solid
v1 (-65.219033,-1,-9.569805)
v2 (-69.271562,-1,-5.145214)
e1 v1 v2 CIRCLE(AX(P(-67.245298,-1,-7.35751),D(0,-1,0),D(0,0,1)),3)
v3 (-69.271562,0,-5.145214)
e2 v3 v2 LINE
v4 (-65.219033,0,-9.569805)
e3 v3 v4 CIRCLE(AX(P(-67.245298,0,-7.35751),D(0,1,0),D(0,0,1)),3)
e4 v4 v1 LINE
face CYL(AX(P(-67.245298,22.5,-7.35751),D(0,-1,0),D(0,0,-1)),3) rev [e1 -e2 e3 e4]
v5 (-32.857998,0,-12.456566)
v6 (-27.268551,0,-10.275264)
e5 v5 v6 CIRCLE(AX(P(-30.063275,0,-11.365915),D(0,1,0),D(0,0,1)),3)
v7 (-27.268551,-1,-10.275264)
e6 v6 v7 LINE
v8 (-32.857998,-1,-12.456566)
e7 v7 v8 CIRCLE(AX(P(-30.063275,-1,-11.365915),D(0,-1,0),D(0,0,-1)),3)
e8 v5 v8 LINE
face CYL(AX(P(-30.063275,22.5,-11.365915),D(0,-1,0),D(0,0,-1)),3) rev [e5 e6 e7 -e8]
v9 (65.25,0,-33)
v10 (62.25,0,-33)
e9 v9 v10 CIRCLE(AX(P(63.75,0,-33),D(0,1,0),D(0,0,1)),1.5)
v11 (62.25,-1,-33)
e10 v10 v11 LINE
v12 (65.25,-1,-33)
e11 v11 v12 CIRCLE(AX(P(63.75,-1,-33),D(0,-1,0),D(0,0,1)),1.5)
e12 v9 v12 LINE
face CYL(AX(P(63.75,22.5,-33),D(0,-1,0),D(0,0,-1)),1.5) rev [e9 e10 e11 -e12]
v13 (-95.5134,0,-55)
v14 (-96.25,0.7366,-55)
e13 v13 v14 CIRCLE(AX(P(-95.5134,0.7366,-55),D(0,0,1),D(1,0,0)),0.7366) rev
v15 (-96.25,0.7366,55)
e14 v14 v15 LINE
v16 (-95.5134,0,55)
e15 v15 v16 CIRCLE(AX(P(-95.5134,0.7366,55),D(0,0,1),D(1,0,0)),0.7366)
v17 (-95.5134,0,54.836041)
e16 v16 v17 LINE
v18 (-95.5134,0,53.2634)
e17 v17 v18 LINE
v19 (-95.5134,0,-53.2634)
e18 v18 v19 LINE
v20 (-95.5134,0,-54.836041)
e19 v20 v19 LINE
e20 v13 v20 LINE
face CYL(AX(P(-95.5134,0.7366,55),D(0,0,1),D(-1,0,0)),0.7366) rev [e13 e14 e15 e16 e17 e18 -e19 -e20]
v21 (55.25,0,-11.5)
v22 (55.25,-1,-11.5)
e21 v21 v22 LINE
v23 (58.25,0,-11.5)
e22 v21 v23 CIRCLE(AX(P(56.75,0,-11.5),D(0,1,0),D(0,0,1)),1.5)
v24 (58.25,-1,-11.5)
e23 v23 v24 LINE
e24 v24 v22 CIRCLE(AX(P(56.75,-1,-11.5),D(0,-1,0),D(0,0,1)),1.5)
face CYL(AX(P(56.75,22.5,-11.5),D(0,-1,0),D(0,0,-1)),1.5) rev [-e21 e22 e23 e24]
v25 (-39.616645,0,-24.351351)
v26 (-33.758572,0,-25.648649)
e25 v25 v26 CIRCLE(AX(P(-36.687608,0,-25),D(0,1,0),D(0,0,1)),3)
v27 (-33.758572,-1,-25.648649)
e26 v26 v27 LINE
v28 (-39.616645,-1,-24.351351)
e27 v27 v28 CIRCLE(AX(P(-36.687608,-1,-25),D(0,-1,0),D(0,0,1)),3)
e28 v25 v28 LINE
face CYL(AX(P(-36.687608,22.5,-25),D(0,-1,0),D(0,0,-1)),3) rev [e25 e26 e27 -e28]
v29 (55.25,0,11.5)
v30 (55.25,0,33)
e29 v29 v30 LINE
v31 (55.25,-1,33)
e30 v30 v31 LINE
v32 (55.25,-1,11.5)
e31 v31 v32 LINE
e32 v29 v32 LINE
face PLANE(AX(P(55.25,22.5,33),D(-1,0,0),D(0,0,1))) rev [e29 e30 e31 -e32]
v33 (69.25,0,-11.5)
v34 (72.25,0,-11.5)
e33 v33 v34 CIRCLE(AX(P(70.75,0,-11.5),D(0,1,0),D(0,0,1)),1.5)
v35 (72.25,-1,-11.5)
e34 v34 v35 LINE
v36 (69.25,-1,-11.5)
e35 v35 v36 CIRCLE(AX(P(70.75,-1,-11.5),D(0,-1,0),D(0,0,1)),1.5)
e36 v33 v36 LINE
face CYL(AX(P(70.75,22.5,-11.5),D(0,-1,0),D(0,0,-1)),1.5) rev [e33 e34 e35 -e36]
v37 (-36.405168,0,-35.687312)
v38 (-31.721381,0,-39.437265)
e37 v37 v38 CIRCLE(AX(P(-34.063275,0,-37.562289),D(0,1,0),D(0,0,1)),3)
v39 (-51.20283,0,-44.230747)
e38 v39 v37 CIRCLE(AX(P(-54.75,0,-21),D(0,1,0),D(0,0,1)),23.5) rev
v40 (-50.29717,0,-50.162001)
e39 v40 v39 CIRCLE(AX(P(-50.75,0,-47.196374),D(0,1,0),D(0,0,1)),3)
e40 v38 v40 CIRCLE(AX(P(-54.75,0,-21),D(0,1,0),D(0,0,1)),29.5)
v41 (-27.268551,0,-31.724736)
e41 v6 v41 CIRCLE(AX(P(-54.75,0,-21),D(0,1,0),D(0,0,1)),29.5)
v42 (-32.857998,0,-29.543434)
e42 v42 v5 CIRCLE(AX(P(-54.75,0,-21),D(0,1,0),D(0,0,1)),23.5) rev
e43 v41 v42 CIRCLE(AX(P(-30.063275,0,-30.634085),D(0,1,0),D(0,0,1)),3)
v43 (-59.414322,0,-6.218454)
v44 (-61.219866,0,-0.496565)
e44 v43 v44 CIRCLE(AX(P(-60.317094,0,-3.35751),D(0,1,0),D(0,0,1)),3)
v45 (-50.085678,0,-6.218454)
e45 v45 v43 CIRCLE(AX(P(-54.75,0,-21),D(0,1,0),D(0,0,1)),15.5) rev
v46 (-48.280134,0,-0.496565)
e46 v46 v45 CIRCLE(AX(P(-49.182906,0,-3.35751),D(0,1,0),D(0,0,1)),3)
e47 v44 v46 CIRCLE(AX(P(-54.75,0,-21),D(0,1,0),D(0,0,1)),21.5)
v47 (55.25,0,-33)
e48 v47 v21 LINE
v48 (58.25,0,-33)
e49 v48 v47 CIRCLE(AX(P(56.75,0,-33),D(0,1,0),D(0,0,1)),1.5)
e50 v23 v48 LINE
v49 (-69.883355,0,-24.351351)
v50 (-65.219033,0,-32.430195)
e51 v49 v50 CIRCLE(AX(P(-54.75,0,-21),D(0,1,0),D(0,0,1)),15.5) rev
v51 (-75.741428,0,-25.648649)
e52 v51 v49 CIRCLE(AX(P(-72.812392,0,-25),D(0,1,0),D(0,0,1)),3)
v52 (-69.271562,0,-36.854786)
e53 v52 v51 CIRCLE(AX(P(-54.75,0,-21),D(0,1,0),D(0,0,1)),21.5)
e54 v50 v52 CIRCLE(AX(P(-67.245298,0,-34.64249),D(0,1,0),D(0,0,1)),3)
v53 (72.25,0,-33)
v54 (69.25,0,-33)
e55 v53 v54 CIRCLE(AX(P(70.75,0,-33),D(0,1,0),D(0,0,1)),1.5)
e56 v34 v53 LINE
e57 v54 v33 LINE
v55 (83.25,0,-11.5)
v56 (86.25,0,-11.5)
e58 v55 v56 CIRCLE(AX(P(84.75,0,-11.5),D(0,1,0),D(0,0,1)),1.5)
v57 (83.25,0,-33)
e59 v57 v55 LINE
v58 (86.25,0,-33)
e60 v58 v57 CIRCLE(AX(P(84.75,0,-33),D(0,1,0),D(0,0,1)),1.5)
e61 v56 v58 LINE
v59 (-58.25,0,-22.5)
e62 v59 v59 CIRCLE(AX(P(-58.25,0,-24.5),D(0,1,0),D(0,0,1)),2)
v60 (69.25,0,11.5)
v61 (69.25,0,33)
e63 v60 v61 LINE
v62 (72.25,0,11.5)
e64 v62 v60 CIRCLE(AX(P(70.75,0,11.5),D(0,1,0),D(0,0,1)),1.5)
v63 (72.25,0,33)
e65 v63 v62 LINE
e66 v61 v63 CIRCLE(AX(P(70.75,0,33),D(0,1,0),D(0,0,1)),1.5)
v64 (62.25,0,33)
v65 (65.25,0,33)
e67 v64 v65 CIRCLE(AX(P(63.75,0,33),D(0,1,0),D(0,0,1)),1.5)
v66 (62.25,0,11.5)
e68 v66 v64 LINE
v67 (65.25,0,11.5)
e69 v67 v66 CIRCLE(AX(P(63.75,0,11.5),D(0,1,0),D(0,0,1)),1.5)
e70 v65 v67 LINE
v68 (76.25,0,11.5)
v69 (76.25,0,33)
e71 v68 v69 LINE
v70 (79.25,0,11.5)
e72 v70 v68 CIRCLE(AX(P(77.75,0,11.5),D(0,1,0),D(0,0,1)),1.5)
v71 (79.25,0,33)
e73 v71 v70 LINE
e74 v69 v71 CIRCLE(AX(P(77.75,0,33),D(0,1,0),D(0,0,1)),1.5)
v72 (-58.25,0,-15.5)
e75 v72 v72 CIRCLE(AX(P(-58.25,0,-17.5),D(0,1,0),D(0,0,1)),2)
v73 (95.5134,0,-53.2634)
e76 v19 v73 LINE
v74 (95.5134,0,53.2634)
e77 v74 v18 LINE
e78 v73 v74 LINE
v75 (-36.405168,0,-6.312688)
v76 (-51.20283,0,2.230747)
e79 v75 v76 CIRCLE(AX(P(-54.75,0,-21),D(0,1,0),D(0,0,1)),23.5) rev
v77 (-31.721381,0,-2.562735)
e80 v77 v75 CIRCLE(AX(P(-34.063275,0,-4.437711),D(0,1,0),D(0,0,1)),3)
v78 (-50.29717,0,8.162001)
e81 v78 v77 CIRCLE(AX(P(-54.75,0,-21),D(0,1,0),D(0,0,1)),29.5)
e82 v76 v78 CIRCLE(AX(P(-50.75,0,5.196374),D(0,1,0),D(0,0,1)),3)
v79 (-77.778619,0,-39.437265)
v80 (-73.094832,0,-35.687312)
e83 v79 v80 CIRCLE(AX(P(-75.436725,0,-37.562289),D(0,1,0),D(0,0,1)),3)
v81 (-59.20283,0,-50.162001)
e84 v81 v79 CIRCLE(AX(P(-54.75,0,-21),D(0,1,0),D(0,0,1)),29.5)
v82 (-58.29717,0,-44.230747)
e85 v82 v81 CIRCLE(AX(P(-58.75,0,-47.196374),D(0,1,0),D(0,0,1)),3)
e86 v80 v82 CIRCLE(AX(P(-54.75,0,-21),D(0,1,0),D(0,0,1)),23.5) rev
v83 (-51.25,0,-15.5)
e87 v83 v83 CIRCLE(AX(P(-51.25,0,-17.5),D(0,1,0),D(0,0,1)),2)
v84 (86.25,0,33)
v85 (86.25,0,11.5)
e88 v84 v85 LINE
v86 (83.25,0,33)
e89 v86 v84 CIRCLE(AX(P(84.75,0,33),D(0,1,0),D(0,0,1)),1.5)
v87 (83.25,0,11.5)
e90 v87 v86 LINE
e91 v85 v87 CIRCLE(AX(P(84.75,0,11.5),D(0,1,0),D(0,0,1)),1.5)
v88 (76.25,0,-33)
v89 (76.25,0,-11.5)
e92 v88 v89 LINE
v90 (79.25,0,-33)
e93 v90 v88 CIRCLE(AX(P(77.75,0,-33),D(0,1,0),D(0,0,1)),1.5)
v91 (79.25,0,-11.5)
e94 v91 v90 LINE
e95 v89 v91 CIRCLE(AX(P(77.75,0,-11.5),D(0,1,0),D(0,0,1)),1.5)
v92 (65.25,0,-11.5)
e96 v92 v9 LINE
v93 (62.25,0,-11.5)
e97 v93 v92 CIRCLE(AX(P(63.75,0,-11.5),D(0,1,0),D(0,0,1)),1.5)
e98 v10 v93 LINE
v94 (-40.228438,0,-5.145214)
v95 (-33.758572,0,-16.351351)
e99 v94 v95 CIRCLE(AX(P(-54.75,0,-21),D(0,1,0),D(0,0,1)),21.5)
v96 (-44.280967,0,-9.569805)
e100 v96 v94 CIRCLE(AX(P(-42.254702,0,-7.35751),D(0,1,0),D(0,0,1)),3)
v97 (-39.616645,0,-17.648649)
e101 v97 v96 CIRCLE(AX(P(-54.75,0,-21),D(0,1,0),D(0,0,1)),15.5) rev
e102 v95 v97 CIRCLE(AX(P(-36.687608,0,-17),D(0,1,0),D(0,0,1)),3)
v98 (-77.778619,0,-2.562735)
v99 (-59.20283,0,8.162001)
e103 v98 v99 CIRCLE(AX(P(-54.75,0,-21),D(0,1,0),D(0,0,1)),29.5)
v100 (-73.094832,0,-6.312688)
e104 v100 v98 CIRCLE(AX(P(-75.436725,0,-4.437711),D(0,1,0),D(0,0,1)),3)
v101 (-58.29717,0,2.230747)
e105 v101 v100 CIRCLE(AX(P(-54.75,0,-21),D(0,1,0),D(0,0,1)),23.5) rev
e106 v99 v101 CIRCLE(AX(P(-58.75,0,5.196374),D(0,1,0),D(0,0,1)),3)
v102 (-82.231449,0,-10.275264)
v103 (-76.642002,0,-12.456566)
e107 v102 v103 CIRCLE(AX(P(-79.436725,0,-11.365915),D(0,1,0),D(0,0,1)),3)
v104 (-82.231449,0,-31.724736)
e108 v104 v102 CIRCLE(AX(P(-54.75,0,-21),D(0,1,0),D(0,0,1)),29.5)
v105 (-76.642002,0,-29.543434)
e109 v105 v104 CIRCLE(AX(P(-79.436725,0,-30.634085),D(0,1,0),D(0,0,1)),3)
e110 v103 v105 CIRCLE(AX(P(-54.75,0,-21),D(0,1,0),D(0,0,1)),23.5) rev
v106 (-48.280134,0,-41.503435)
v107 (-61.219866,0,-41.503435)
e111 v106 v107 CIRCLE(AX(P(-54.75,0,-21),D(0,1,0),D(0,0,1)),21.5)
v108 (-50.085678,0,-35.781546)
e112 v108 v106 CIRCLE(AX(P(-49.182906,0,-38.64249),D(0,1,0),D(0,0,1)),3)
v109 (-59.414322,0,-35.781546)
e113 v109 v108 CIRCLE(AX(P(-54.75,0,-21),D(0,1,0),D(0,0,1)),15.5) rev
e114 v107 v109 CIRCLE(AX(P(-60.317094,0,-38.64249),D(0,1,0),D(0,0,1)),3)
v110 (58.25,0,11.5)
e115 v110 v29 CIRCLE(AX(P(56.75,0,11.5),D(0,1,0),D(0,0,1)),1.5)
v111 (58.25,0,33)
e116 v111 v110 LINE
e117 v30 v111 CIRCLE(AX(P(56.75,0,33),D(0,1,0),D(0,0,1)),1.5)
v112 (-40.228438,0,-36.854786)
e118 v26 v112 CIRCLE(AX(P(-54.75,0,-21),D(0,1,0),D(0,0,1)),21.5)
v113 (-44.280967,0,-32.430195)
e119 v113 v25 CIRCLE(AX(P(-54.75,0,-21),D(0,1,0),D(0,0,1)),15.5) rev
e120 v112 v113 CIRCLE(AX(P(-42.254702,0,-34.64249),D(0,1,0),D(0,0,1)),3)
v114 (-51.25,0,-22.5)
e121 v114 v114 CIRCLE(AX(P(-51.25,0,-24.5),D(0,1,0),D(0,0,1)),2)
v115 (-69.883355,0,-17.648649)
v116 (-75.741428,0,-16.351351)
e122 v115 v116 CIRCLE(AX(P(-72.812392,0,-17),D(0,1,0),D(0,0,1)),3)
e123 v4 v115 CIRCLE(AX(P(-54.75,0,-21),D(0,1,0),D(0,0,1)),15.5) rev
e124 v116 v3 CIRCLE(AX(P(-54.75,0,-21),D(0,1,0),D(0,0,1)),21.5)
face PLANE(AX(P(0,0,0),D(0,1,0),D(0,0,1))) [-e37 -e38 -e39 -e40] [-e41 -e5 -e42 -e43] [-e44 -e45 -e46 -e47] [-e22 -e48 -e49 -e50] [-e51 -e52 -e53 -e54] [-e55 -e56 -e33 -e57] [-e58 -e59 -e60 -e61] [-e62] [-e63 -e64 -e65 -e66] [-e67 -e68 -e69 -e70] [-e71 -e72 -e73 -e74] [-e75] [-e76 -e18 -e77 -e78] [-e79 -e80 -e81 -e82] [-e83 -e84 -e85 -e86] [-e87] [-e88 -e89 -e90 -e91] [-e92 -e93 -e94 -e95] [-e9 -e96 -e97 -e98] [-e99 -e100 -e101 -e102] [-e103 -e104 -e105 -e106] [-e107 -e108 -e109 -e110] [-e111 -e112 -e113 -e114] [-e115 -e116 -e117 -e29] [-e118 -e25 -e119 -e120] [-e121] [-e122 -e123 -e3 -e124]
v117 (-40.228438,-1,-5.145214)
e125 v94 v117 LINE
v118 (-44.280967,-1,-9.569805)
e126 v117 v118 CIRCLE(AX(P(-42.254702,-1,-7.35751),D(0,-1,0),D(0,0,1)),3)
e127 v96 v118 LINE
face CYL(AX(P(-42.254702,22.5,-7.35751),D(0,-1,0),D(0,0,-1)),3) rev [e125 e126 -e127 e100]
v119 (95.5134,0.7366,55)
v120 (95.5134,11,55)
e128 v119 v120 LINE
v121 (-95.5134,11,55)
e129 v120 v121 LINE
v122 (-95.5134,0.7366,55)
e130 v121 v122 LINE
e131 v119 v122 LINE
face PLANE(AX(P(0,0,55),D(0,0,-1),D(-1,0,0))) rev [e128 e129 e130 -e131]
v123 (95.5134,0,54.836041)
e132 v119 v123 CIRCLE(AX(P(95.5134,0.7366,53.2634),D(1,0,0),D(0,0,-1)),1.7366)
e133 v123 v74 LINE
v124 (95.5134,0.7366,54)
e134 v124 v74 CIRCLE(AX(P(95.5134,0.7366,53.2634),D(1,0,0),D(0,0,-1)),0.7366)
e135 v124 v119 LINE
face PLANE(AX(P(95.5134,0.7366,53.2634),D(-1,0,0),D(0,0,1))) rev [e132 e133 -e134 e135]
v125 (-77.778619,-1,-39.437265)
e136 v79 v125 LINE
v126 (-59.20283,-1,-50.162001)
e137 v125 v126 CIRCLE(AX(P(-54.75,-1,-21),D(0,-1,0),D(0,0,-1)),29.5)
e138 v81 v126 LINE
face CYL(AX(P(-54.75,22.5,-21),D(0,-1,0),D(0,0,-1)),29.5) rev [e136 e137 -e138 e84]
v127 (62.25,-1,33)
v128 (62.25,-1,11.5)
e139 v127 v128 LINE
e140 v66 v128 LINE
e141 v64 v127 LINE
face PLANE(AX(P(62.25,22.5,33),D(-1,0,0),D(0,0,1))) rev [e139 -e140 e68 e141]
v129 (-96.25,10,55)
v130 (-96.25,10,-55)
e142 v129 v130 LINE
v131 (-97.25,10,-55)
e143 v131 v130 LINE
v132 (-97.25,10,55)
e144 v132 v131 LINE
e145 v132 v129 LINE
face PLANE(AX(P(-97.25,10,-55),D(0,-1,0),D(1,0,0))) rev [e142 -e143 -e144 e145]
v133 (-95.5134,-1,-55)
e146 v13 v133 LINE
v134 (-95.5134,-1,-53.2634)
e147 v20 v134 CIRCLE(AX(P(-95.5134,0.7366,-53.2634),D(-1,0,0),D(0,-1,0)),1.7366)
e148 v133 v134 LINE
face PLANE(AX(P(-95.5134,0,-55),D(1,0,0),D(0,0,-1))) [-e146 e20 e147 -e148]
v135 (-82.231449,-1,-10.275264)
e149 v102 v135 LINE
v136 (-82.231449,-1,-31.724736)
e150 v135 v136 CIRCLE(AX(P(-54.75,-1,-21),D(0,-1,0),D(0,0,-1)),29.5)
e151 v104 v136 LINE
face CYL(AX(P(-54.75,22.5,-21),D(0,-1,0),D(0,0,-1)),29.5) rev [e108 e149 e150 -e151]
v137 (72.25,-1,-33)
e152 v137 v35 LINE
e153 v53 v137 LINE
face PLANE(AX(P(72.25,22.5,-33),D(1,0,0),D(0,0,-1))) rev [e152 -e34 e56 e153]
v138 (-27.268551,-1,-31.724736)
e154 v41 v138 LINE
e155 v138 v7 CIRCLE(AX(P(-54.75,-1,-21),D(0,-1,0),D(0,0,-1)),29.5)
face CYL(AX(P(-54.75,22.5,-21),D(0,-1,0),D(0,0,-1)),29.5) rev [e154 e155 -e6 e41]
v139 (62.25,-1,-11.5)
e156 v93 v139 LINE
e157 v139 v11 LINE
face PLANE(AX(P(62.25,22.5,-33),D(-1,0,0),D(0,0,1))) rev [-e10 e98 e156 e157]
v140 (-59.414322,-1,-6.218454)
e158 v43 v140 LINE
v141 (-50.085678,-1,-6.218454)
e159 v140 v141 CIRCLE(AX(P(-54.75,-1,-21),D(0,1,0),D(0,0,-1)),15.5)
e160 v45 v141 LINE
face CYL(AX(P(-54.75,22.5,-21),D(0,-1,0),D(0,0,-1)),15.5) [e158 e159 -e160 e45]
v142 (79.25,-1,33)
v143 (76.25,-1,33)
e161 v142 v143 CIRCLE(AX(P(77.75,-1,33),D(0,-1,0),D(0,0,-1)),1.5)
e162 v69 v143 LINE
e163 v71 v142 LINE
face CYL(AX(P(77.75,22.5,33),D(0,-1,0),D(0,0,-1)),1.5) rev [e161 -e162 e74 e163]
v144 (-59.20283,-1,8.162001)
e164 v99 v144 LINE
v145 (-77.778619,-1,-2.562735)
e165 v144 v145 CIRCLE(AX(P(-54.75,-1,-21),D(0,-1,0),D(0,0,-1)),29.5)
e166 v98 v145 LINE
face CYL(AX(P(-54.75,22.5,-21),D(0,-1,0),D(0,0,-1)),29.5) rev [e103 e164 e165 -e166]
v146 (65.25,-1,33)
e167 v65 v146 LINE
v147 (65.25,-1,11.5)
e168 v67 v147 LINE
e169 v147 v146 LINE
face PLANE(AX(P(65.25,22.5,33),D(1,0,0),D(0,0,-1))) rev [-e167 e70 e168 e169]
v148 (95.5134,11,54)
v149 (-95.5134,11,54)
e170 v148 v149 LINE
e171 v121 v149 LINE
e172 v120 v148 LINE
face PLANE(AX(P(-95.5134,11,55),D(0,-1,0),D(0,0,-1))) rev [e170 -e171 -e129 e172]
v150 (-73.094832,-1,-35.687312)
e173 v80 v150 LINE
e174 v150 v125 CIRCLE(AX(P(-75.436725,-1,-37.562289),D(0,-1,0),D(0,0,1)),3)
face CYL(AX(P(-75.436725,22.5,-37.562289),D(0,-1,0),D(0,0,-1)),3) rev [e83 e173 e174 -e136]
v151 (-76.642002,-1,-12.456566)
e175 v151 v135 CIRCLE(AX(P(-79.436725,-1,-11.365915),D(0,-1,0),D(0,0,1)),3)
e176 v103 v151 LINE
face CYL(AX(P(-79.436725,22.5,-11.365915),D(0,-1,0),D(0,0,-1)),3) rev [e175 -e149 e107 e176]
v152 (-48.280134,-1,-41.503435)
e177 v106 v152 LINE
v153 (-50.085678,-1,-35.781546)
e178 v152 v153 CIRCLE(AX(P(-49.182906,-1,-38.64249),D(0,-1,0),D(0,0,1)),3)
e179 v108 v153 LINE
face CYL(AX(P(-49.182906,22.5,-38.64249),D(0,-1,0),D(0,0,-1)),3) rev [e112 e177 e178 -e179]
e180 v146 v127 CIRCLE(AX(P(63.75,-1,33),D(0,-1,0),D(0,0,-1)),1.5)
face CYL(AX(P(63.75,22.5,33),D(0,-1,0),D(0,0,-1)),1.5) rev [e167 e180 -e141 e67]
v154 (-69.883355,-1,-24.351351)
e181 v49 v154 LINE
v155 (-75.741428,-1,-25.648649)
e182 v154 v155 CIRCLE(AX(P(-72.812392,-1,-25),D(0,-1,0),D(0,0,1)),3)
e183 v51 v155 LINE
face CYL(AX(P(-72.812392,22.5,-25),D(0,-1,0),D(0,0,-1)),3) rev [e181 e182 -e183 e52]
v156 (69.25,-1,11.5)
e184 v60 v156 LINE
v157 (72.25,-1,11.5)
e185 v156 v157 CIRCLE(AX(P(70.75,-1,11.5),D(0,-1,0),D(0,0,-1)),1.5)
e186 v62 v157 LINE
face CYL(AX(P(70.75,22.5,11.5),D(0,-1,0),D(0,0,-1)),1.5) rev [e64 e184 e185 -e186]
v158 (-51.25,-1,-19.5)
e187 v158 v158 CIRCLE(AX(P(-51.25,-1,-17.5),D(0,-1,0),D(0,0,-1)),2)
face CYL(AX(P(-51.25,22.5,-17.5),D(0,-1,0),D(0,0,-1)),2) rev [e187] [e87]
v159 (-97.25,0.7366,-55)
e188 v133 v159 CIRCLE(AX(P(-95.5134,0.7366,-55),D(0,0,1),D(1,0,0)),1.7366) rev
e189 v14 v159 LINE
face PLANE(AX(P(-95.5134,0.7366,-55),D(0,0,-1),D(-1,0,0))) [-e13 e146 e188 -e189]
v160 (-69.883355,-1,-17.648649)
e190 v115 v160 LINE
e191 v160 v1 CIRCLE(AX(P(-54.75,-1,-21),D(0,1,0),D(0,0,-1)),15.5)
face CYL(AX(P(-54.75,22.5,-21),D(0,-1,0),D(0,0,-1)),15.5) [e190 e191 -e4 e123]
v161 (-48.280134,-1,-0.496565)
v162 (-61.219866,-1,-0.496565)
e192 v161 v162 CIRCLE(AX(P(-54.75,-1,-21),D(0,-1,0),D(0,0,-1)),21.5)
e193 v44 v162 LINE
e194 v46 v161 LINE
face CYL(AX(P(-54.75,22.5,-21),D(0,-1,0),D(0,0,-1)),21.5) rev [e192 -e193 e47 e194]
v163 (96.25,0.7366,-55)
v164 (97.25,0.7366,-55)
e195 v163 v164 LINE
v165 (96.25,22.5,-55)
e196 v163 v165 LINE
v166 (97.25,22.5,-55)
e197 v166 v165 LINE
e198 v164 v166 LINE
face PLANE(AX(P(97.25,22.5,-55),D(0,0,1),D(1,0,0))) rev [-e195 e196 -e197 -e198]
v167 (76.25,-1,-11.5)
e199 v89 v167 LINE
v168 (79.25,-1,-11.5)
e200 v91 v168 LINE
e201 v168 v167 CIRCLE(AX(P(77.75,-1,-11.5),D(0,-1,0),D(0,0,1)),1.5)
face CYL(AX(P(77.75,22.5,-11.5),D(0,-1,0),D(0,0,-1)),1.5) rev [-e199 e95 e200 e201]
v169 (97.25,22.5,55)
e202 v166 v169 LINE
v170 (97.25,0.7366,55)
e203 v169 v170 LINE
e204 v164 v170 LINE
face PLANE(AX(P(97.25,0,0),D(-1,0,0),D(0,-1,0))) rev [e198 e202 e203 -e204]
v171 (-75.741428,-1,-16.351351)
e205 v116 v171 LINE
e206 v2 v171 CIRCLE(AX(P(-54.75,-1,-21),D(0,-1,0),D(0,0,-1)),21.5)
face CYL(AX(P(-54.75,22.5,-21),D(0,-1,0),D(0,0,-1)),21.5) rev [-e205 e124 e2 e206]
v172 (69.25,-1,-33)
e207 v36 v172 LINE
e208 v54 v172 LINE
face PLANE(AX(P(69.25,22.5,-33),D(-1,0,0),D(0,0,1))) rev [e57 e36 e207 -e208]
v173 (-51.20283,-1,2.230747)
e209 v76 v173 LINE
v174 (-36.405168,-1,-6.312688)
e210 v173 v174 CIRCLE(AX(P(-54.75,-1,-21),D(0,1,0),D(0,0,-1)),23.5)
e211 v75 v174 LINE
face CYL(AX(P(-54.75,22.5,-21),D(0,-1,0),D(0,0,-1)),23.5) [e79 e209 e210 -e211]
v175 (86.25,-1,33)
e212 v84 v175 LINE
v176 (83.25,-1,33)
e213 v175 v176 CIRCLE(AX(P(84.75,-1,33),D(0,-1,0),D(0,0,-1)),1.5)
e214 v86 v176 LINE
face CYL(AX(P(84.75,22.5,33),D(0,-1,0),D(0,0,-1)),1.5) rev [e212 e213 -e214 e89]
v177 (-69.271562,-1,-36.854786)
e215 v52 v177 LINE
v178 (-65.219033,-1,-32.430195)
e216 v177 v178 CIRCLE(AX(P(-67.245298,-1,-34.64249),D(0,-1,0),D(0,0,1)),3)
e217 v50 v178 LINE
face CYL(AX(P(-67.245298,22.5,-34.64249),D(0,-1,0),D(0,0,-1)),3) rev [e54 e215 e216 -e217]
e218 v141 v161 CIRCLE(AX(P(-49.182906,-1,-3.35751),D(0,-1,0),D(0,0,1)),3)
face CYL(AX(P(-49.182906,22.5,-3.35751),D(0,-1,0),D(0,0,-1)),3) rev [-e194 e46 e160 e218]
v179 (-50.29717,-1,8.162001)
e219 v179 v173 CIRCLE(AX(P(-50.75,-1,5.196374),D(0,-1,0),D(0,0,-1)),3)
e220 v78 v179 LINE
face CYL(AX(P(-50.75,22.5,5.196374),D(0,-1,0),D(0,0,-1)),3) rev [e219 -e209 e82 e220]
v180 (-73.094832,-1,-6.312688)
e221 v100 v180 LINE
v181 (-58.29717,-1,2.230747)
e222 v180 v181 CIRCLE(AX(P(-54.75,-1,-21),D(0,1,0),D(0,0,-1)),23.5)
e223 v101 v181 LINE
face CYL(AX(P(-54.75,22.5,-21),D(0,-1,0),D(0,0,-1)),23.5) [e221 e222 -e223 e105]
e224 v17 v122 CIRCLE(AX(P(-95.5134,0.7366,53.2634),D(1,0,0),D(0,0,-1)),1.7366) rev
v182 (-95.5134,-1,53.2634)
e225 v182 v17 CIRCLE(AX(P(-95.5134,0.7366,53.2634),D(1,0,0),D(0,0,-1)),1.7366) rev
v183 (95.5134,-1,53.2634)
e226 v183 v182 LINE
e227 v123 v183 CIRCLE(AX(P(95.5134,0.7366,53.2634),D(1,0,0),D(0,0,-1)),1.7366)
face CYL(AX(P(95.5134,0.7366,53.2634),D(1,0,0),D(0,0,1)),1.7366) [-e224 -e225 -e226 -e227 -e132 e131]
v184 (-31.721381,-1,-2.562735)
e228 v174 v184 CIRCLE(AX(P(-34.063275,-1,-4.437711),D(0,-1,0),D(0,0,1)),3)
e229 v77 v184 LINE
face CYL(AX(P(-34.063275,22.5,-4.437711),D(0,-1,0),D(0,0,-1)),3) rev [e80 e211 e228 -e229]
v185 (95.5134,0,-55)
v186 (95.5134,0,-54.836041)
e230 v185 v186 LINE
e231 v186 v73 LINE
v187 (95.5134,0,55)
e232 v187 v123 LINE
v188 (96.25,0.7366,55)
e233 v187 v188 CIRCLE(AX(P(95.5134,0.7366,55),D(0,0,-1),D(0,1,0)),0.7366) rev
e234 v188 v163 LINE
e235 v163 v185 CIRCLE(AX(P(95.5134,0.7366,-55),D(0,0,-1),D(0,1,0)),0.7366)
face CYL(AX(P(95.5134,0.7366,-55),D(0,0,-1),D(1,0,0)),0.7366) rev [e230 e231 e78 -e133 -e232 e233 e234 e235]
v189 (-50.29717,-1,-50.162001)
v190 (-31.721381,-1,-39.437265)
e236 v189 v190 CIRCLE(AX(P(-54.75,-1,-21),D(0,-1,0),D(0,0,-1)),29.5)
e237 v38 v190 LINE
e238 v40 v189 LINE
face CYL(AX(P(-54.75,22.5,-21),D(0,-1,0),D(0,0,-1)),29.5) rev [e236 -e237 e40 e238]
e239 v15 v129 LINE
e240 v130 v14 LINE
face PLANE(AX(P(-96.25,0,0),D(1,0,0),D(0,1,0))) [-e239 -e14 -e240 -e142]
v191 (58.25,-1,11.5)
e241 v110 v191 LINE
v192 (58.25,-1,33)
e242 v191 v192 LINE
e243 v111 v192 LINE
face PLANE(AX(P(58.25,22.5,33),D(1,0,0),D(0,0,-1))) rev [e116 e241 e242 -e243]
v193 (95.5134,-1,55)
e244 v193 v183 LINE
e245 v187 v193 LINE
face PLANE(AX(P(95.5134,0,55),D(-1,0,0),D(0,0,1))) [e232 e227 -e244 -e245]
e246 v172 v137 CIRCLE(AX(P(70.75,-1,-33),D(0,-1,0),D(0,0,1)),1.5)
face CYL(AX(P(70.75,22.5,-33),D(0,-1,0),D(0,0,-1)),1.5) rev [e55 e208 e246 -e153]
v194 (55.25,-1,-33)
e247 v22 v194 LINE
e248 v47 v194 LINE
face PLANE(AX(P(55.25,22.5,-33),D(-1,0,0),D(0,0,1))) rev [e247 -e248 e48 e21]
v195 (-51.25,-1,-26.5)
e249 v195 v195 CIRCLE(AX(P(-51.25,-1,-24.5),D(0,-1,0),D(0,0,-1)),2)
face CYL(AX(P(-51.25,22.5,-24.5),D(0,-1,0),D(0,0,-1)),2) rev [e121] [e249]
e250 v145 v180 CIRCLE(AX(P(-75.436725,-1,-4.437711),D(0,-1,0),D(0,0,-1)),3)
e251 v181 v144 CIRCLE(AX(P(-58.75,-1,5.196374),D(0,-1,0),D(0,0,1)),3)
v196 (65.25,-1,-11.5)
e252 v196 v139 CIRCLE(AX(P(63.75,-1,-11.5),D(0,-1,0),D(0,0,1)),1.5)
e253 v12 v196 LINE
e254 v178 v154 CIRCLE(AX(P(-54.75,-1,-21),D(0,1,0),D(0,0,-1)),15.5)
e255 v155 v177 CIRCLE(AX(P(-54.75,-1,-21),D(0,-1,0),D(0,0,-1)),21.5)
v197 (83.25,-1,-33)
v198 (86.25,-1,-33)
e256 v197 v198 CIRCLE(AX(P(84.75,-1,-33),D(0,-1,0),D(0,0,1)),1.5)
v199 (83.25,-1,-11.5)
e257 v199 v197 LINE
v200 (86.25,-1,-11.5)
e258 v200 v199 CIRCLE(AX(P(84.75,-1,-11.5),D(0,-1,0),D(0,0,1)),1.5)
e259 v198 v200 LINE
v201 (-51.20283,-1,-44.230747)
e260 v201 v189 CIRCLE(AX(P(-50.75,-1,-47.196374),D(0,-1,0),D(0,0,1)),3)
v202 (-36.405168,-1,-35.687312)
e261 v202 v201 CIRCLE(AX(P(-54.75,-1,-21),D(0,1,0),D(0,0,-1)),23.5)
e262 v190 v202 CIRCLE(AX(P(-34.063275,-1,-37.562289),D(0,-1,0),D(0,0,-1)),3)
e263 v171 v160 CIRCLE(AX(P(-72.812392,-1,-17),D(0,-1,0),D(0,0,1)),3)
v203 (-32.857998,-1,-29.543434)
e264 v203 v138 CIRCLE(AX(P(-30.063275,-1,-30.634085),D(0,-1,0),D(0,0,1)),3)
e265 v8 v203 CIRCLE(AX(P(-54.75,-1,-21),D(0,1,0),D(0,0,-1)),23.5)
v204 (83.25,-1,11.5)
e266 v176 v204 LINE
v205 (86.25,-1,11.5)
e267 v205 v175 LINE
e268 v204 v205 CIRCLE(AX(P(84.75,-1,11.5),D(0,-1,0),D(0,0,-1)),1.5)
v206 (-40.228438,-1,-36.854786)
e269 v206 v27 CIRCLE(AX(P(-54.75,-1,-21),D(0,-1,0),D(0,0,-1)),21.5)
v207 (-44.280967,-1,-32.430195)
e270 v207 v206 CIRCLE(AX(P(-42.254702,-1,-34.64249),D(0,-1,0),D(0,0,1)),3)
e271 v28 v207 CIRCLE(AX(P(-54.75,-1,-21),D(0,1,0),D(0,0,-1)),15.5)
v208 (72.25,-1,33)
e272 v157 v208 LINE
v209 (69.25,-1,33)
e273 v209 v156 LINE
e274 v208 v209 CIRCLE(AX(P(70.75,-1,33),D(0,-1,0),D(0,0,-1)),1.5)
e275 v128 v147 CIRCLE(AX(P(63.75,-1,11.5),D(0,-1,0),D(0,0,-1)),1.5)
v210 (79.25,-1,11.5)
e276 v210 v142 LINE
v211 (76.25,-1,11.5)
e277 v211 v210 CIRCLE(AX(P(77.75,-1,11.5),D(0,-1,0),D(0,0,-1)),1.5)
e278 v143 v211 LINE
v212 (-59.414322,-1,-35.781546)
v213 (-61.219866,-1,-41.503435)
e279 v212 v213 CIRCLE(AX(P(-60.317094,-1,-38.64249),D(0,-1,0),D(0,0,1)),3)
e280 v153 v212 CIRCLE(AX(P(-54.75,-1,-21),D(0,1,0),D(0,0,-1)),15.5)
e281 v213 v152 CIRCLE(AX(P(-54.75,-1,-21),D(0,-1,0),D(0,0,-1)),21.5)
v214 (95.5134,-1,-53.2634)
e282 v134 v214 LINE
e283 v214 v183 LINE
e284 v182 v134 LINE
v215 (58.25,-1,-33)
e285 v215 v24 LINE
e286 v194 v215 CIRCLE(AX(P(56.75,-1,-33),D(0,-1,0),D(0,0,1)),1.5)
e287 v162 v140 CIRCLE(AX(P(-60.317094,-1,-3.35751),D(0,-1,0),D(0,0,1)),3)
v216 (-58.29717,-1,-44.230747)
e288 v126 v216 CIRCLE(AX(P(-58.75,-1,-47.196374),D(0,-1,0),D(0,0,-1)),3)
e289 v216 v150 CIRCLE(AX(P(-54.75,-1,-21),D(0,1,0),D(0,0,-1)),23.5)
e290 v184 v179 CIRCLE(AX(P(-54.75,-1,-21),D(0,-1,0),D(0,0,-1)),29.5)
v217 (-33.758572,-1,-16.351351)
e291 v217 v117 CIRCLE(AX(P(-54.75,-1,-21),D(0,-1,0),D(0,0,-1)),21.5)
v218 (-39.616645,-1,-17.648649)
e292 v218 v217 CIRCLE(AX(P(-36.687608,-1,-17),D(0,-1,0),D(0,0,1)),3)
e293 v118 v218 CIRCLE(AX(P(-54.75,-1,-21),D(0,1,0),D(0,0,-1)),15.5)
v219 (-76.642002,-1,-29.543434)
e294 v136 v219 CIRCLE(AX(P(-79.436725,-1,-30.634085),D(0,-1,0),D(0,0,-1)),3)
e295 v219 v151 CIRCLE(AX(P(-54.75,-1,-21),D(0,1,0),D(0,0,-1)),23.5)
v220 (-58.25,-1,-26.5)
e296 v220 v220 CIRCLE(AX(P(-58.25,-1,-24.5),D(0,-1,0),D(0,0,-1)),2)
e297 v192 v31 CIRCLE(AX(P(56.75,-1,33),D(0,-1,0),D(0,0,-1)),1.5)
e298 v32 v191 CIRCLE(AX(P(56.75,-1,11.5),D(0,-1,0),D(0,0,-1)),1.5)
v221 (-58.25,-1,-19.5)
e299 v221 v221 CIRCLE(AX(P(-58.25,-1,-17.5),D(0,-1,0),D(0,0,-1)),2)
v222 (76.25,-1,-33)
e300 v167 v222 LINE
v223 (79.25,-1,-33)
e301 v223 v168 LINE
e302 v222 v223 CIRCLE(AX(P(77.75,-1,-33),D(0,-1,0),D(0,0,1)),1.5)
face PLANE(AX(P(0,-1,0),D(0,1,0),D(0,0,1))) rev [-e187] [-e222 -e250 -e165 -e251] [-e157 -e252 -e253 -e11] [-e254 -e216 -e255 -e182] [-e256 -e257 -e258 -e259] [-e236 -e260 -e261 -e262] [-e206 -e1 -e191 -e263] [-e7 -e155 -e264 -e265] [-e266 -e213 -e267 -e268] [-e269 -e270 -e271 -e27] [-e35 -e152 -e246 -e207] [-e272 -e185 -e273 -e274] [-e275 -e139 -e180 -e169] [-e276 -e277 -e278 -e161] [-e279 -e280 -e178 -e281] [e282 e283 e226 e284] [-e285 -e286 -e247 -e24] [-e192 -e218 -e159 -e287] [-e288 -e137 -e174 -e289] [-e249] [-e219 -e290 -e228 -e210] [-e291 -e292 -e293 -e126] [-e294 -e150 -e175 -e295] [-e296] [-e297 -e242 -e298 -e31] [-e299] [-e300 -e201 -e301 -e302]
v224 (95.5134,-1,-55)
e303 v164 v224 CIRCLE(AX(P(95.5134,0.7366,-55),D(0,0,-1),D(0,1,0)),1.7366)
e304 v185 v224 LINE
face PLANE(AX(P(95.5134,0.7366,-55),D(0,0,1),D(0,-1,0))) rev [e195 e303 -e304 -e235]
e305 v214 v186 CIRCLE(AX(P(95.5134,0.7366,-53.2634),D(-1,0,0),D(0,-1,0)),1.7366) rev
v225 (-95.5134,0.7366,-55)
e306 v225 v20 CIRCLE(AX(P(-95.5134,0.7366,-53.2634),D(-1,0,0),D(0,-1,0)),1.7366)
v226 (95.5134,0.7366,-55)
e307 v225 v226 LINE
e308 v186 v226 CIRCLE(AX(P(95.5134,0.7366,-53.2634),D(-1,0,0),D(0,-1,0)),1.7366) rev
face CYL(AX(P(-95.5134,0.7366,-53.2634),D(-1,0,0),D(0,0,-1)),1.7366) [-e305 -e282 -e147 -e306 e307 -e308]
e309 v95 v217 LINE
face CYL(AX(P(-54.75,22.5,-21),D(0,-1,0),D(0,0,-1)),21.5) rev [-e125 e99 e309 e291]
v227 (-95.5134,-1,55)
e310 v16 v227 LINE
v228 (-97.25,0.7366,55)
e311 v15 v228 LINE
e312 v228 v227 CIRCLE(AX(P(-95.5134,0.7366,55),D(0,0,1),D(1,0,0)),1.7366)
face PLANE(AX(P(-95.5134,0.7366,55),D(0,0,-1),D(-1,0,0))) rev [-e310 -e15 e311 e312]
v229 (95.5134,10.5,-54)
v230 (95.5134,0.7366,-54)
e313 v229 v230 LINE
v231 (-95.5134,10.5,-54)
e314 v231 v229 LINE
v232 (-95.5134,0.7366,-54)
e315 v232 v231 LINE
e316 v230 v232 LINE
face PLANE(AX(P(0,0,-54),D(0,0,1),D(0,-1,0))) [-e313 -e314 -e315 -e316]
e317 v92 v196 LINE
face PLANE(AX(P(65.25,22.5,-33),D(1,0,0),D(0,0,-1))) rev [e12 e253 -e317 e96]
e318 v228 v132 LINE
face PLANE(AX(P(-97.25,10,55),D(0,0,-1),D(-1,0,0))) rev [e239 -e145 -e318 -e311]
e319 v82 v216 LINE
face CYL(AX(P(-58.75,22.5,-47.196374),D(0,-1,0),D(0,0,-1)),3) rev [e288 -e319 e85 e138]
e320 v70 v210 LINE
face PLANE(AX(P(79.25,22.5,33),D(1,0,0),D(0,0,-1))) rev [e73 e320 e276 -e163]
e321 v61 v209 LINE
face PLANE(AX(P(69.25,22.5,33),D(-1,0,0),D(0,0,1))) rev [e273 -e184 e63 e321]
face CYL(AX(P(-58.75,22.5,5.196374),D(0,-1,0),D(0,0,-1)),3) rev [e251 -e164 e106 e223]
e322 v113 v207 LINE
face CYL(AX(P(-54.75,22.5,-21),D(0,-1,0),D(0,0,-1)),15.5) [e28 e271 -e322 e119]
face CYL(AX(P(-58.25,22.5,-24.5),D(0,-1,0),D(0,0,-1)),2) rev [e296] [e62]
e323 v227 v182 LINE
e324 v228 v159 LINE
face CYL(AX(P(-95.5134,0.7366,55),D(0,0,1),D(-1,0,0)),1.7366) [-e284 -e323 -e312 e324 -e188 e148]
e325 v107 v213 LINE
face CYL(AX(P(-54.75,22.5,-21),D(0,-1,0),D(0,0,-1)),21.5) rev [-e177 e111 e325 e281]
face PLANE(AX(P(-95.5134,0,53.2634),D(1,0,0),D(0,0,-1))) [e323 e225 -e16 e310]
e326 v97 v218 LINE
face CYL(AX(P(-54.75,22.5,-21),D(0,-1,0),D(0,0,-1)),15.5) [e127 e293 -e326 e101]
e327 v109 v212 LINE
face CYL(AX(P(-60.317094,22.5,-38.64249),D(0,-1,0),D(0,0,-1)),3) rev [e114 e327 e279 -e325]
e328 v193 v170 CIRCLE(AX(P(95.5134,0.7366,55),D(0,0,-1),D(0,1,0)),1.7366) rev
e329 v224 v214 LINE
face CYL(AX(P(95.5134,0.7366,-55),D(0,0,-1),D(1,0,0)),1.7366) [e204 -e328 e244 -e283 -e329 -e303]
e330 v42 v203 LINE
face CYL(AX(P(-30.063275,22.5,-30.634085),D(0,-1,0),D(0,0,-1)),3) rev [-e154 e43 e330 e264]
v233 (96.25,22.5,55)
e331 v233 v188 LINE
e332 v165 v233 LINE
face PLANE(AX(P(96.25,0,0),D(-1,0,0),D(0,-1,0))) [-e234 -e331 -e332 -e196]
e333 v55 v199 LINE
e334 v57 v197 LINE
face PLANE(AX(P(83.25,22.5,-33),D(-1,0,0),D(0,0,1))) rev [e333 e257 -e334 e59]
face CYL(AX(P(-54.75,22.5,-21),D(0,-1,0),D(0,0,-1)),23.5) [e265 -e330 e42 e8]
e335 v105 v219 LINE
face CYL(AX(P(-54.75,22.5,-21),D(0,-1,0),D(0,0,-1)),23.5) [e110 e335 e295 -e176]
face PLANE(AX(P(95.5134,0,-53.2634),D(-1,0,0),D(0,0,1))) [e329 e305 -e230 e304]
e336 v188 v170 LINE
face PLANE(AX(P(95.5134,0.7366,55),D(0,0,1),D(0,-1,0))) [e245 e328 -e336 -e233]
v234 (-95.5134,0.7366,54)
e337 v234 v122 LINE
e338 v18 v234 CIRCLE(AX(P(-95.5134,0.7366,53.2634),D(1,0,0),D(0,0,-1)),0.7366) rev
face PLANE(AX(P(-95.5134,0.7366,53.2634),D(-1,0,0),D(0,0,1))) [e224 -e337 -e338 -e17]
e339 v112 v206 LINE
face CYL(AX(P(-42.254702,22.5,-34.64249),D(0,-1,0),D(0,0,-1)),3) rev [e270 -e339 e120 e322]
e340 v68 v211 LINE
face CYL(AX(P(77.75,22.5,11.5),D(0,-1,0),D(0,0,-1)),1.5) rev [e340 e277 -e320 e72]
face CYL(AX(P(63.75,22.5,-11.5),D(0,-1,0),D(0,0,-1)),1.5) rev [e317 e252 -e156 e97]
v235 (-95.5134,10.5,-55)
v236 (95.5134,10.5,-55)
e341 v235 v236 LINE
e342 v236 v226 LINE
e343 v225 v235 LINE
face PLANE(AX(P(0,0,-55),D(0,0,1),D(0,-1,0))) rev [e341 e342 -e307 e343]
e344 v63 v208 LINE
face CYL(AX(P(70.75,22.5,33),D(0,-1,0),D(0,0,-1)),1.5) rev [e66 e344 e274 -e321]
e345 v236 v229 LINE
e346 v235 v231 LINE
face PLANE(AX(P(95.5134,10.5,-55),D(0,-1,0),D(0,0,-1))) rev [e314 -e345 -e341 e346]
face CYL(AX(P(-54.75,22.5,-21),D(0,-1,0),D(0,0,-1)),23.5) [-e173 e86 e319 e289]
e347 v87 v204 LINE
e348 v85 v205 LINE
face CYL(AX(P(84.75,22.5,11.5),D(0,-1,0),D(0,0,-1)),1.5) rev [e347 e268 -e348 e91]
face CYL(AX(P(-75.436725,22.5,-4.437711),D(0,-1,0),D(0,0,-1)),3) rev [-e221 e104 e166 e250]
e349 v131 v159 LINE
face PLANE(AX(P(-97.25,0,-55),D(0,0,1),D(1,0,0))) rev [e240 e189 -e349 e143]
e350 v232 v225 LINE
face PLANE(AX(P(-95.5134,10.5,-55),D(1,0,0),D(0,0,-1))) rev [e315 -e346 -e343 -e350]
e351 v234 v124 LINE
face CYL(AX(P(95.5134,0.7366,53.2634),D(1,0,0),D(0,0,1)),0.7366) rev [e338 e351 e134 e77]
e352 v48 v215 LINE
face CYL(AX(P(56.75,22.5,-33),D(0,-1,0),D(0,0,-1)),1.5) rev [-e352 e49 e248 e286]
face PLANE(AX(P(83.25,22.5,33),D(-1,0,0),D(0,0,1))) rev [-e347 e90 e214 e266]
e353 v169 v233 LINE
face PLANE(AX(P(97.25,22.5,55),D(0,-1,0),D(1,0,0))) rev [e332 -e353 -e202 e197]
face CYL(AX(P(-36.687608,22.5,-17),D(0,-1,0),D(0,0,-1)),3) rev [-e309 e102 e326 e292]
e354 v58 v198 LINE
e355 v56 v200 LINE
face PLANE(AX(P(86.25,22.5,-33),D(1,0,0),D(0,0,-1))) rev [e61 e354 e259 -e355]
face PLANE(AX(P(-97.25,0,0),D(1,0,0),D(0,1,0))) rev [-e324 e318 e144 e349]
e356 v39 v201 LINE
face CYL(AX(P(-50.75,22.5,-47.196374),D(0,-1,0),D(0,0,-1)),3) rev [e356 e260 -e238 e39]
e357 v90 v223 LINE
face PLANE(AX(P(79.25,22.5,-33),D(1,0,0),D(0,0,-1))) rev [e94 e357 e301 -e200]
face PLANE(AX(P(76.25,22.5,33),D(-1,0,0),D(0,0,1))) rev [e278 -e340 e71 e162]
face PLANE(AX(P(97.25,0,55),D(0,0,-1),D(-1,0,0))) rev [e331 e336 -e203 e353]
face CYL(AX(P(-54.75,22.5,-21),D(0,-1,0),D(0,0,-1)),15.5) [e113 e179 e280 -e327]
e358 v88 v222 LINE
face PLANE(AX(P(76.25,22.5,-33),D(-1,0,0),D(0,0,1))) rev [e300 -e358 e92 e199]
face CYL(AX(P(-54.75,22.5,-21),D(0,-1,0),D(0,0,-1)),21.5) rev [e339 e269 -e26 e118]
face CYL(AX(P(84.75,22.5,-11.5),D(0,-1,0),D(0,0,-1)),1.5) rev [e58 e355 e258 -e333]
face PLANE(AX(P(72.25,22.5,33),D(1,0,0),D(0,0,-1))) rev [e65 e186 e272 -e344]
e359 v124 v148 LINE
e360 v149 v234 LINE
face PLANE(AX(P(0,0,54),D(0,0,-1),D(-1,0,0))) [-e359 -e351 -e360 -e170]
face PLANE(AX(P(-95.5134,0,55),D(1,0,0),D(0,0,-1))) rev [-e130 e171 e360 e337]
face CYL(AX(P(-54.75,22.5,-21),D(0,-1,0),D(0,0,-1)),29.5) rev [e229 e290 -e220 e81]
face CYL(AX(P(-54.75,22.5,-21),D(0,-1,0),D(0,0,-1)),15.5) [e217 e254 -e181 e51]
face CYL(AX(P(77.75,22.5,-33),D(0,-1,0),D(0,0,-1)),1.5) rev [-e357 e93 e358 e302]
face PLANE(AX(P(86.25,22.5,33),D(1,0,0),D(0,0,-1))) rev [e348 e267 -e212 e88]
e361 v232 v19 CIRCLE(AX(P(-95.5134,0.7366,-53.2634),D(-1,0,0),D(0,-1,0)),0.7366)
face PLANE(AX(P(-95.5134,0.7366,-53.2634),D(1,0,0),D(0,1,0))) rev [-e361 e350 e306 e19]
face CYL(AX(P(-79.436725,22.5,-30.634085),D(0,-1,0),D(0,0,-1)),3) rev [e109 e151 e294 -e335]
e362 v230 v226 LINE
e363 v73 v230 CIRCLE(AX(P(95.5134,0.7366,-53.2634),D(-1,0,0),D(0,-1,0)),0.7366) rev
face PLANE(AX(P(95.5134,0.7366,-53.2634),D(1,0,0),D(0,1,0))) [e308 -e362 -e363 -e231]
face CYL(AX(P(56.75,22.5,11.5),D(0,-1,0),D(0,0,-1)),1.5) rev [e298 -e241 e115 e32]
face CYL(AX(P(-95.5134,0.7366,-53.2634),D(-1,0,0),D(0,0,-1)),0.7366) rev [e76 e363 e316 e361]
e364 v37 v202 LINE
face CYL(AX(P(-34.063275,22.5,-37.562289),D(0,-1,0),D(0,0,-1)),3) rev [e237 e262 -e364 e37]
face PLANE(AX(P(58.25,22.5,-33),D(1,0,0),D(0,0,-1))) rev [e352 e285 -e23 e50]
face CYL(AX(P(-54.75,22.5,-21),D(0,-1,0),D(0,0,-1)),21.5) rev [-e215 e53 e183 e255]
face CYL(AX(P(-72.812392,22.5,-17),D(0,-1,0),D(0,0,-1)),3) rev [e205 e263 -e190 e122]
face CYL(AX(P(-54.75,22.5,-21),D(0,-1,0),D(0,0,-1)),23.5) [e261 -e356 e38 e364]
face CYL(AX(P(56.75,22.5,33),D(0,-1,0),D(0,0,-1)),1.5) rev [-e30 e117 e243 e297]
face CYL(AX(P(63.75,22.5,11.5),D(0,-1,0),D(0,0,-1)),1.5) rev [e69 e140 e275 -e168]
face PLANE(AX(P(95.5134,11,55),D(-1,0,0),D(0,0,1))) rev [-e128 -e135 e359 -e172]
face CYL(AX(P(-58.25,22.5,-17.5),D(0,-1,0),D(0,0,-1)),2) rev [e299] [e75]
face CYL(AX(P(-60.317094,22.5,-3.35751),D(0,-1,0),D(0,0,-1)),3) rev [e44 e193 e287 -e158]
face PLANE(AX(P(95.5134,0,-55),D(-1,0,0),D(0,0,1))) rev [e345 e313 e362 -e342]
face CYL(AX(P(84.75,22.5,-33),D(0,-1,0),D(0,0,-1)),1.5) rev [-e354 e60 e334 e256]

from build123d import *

# Parameters (mm, degrees)
SKETCH_1_W                       = 194.5
SKETCH_1_H                       = 110
SM_BASE_FLANGE_1_DEPTH           = 1
SM_EDGE_FLANGE_1_STRIP_W         = 5.4732
SM_EDGE_FLANGE_1_STRIP_H         = 1
SM_EDGE_FLANGE_1_STRIP_CUT_DEPTH = 110
SM_EDGE_FLANGE_1_DEPTH           = 110
SM_EDGE_FLANGE_2_STRIP_W         = 5.4732
SM_EDGE_FLANGE_2_STRIP_H         = 1
SM_EDGE_FLANGE_2_STRIP_CUT_DEPTH = 110
SM_EDGE_FLANGE_2_DEPTH           = 110
SM_EDGE_FLANGE_3_STRIP_W         = 5.4732
SM_EDGE_FLANGE_3_STRIP_H         = 1
SM_EDGE_FLANGE_3_STRIP_CUT_DEPTH = 191.0268
SM_EDGE_FLANGE_3_DEPTH           = 191.0268
SM_EDGE_FLANGE_4_STRIP_W         = 5.4732
SM_EDGE_FLANGE_4_STRIP_H         = 1
SM_EDGE_FLANGE_4_STRIP_CUT_DEPTH = 191.0268
SM_EDGE_FLANGE_4_DEPTH           = 191.0268
SKETCH_18_R                      = 2
CUT_EXTRUDE_1_DEPTH              = 115.170103355


# Sheet-metal steps are written as plain solids
with BuildPart() as part:
    # Sketch 1 → Базовая кромка1 (new body)
    with BuildSketch(Plane(origin=(0, 0, 0), x_dir=(1, 0, 0), z_dir=(0, 1, 0))):
        Rectangle(SKETCH_1_W, SKETCH_1_H)
    extrude(amount=-SM_BASE_FLANGE_1_DEPTH)

    # Ребро-кромка1 strip (across the edge) → Ребро-кромка1 strip cut (cut)
    with BuildSketch(Plane(origin=(97.25, 0, 55), x_dir=(-1, 0, 0), z_dir=(0, 0, -1))):
        with Locations((-1, -0.5)):
            Rectangle(SM_EDGE_FLANGE_1_STRIP_W, SM_EDGE_FLANGE_1_STRIP_H)
    extrude(amount=SM_EDGE_FLANGE_1_STRIP_CUT_DEPTH, mode=Mode.SUBTRACT)

    # Ребро-кромка1 section (across the edge) → Ребро-кромка1 (add)
    with BuildSketch(Plane(origin=(97.25, 0, 55), x_dir=(-1, 0, 0), z_dir=(0, 0, -1))):
        with BuildLine():
            Line((0, 0.7366), (0, 22.5))
            Line((0, 22.5), (1, 22.5))
            Line((1, 22.5), (1, 0.7366))
            ThreePointArc((1, 0.7366), (1.215745145, 0.215745145), (1.7366, 0))
            Line((1.7366, 0), (1.7366, -1))
            ThreePointArc((1.7366, -1), (0.508638364, -0.491361636), (0, 0.7366))
        make_face()
    extrude(amount=SM_EDGE_FLANGE_1_DEPTH)

    # Ребро-кромка2 strip (across the edge) → Ребро-кромка2 strip cut (cut)
    with BuildSketch(Plane(origin=(-97.25, 0, -55), x_dir=(1, 0, 0), z_dir=(0, 0, 1))):
        with Locations((-1, -0.5)):
            Rectangle(SM_EDGE_FLANGE_2_STRIP_W, SM_EDGE_FLANGE_2_STRIP_H)
    extrude(amount=SM_EDGE_FLANGE_2_STRIP_CUT_DEPTH, mode=Mode.SUBTRACT)

    # Ребро-кромка2 section (across the edge) → Ребро-кромка2 (add)
    with BuildSketch(Plane(origin=(-97.25, 0, -55), x_dir=(1, 0, 0), z_dir=(0, 0, 1))):
        with BuildLine():
            Line((0, 0.7366), (0, 10))
            Line((0, 10), (1, 10))
            Line((1, 10), (1, 0.7366))
            ThreePointArc((1, 0.7366), (1.215745145, 0.215745145), (1.7366, 0))
            Line((1.7366, 0), (1.7366, -1))
            ThreePointArc((1.7366, -1), (0.508638364, -0.491361636), (0, 0.7366))
        make_face()
    extrude(amount=SM_EDGE_FLANGE_2_DEPTH)

    # Ребро-кромка3 strip (across the edge) → Ребро-кромка3 strip cut (cut)
    with BuildSketch(Plane(origin=(-95.5134, 0, 55), x_dir=(0, 0, -1), z_dir=(1, 0, 0))):
        with Locations((-1, -0.5)):
            Rectangle(SM_EDGE_FLANGE_3_STRIP_W, SM_EDGE_FLANGE_3_STRIP_H)
    extrude(amount=SM_EDGE_FLANGE_3_STRIP_CUT_DEPTH, mode=Mode.SUBTRACT)

    # Ребро-кромка3 section (across the edge) → Ребро-кромка3 (add)
    with BuildSketch(Plane(origin=(-95.5134, 0, 55), x_dir=(0, 0, -1), z_dir=(1, 0, 0))):
        with BuildLine():
            Line((0, 0.7366), (0, 11))
            Line((0, 11), (1, 11))
            Line((1, 11), (1, 0.7366))
            ThreePointArc((1, 0.7366), (1.215745145, 0.215745145), (1.7366, 0))
            Line((1.7366, 0), (1.7366, -1))
            ThreePointArc((1.7366, -1), (0.508638364, -0.491361636), (0, 0.7366))
        make_face()
    extrude(amount=SM_EDGE_FLANGE_3_DEPTH)

    # Ребро-кромка4 strip (across the edge) → Ребро-кромка4 strip cut (cut)
    with BuildSketch(Plane(origin=(95.5134, 0, -55), x_dir=(0, 0, 1), z_dir=(-1, 0, 0))):
        with Locations((-1, -0.5)):
            Rectangle(SM_EDGE_FLANGE_4_STRIP_W, SM_EDGE_FLANGE_4_STRIP_H)
    extrude(amount=SM_EDGE_FLANGE_4_STRIP_CUT_DEPTH, mode=Mode.SUBTRACT)

    # Ребро-кромка4 section (across the edge) → Ребро-кромка4 (add)
    with BuildSketch(Plane(origin=(95.5134, 0, -55), x_dir=(0, 0, 1), z_dir=(-1, 0, 0))):
        with BuildLine():
            Line((0, 0.7366), (0, 10.5))
            Line((0, 10.5), (1, 10.5))
            Line((1, 10.5), (1, 0.7366))
            ThreePointArc((1, 0.7366), (1.215745145, 0.215745145), (1.7366, 0))
            Line((1.7366, 0), (1.7366, -1))
            ThreePointArc((1.7366, -1), (0.508638364, -0.491361636), (0, 0.7366))
        make_face()
    extrude(amount=SM_EDGE_FLANGE_4_DEPTH)

    # Эскиз18 → Вырез-Вытянуть1 (cut, through all)
    with BuildSketch(Plane.XZ.offset(1)):
        with Locations(Location((-58.25, -17.5, 0), (0, 0, 270))):
            Circle(SKETCH_18_R)
        with Locations(Location((-51.25, -17.5, 0), (0, 0, 270))):
            Circle(SKETCH_18_R)
        with Locations(Location((-51.25, -24.5, 0), (0, 0, 270))):
            Circle(SKETCH_18_R)
        with Locations(Location((-58.25, -24.5, 0), (0, 0, 270))):
            Circle(SKETCH_18_R)
        with BuildLine():
            Line((86.25, 33), (86.25, 11.5))
            ThreePointArc((86.25, 11.5), (84.75, 10), (83.25, 11.5))
            Line((83.25, 11.5), (83.25, 33))
            ThreePointArc((83.25, 33), (84.75, 34.5), (86.25, 33))
        make_face()
        with BuildLine():
            Line((86.25, -33), (86.25, -11.5))
            ThreePointArc((86.25, -11.5), (84.75, -10), (83.25, -11.5))
            Line((83.25, -11.5), (83.25, -33))
            ThreePointArc((83.25, -33), (84.75, -34.5), (86.25, -33))
        make_face()
        with BuildLine():
            Line((79.25, 33), (79.25, 11.5))
            ThreePointArc((79.25, 11.5), (77.75, 10), (76.25, 11.5))
            Line((76.25, 11.5), (76.25, 33))
            ThreePointArc((76.25, 33), (77.75, 34.5), (79.25, 33))
        make_face()
        with BuildLine():
            Line((79.25, -33), (79.25, -11.5))
            ThreePointArc((79.25, -11.5), (77.75, -10), (76.25, -11.5))
            Line((76.25, -11.5), (76.25, -33))
            ThreePointArc((76.25, -33), (77.75, -34.5), (79.25, -33))
        make_face()
        with BuildLine():
            Line((72.25, 33), (72.25, 11.5))
            ThreePointArc((72.25, 11.5), (70.75, 10), (69.25, 11.5))
            Line((69.25, 11.5), (69.25, 33))
            ThreePointArc((69.25, 33), (70.75, 34.5), (72.25, 33))
        make_face()
        with BuildLine():
            Line((72.25, -33), (72.25, -11.5))
            ThreePointArc((72.25, -11.5), (70.75, -10), (69.25, -11.5))
            Line((69.25, -11.5), (69.25, -33))
            ThreePointArc((69.25, -33), (70.75, -34.5), (72.25, -33))
        make_face()
        with BuildLine():
            Line((65.25, 33), (65.25, 11.5))
            ThreePointArc((65.25, 11.5), (63.75, 10), (62.25, 11.5))
            Line((62.25, 11.5), (62.25, 33))
            ThreePointArc((62.25, 33), (63.75, 34.5), (65.25, 33))
        make_face()
        with BuildLine():
            Line((65.25, -33), (65.25, -11.5))
            ThreePointArc((65.25, -11.5), (63.75, -10), (62.25, -11.5))
            Line((62.25, -11.5), (62.25, -33))
            ThreePointArc((62.25, -33), (63.75, -34.5), (65.25, -33))
        make_face()
        with BuildLine():
            Line((58.25, 33), (58.25, 11.5))
            ThreePointArc((58.25, 11.5), (56.75, 10), (55.25, 11.5))
            Line((55.25, 11.5), (55.25, 33))
            ThreePointArc((55.25, 33), (56.75, 34.5), (58.25, 33))
        make_face()
        with BuildLine():
            Line((58.25, -33), (58.25, -11.5))
            ThreePointArc((58.25, -11.5), (56.75, -10), (55.25, -11.5))
            Line((55.25, -11.5), (55.25, -33))
            ThreePointArc((55.25, -33), (56.75, -34.5), (58.25, -33))
        make_face()
        with BuildLine():
            ThreePointArc((-82.2314488, -10.275263554), (-84.25, -21), (-82.2314488, -31.724736446))
            ThreePointArc((-82.2314488, -31.724736446), (-78.346074029, -33.428808889), (-76.642001587, -29.543434118))
            ThreePointArc((-76.642001587, -29.543434118), (-78.25, -21), (-76.642001587, -12.456565882))
            ThreePointArc((-76.642001587, -12.456565882), (-78.346074029, -8.571191111), (-82.2314488, -10.275263554))
        make_face()
        with BuildLine():
            ThreePointArc((-61.219866371, -41.503434569), (-54.75, -42.5), (-48.280133629, -41.503434569))
            ThreePointArc((-48.280133629, -41.503434569), (-46.321961323, -37.739718159), (-50.085677733, -35.781545852))
            ThreePointArc((-50.085677733, -35.781545852), (-54.75, -36.5), (-59.414322267, -35.781545852))
            ThreePointArc((-59.414322267, -35.781545852), (-63.178038677, -37.739718159), (-61.219866371, -41.503434569))
        make_face()
        with BuildLine():
            ThreePointArc((-59.202830189, 8.162001017), (-69.5, 4.547749412), (-77.778618611, -2.562735429))
            ThreePointArc((-77.778618611, -2.562735429), (-77.311701251, -6.779604906), (-73.094831775, -6.312687545))
            ThreePointArc((-73.094831775, -6.312687545), (-66.5, -0.648403011), (-58.297169811, 2.230746573))
            ThreePointArc((-58.297169811, 2.230746573), (-55.784372778, 5.649203984), (-59.202830189, 8.162001017))
        make_face()
        with BuildLine():
            ThreePointArc((-75.741428387, -25.648648649), (-73.369546181, -31.75), (-69.271562017, -36.854785921))
            ThreePointArc((-69.271562017, -36.854785921), (-65.033001839, -36.668754678), (-65.219033082, -32.430194501))
            ThreePointArc((-65.219033082, -32.430194501), (-68.173393759, -28.75), (-69.883355349, -24.351351351))
            ThreePointArc((-69.883355349, -24.351351351), (-73.461040517, -22.070963481), (-75.741428387, -25.648648649))
        make_face()
        with BuildLine():
            ThreePointArc((-31.721381389, -2.562735429), (-40, 4.547749412), (-50.297169811, 8.162001017))
            ThreePointArc((-50.297169811, 8.162001017), (-53.715627222, 5.649203984), (-51.202830189, 2.230746573))
            ThreePointArc((-51.202830189, 2.230746573), (-43, -0.648403011), (-36.405168225, -6.312687545))
            ThreePointArc((-36.405168225, -6.312687545), (-32.188298749, -6.779604906), (-31.721381389, -2.562735429))
        make_face()
        with BuildLine():
            ThreePointArc((-69.271562017, -5.145214079), (-73.369546181, -10.25), (-75.741428387, -16.351351351))
            ThreePointArc((-75.741428387, -16.351351351), (-73.461040517, -19.929036519), (-69.883355349, -17.648648649))
            ThreePointArc((-69.883355349, -17.648648649), (-68.173393759, -13.25), (-65.219033082, -9.569805499))
            ThreePointArc((-65.219033082, -9.569805499), (-65.033001839, -5.331245322), (-69.271562017, -5.145214079))
        make_face()
        with BuildLine():
            ThreePointArc((-27.2685512, -31.724736446), (-25.25, -21), (-27.2685512, -10.275263554))
            ThreePointArc((-27.2685512, -10.275263554), (-31.153925971, -8.571191111), (-32.857998413, -12.456565882))
            ThreePointArc((-32.857998413, -12.456565882), (-31.25, -21), (-32.857998413, -29.543434118))
            ThreePointArc((-32.857998413, -29.543434118), (-31.153925971, -33.428808889), (-27.2685512, -31.724736446))
        make_face()
        with BuildLine():
            ThreePointArc((-48.280133629, -0.496565431), (-54.75, 0.5), (-61.219866371, -0.496565431))
            ThreePointArc((-61.219866371, -0.496565431), (-63.178038677, -4.260281841), (-59.414322267, -6.218454148))
            ThreePointArc((-59.414322267, -6.218454148), (-54.75, -5.5), (-50.085677733, -6.218454148))
            ThreePointArc((-50.085677733, -6.218454148), (-46.321961323, -4.260281841), (-48.280133629, -0.496565431))
        make_face()
        with BuildLine():
            ThreePointArc((-50.297169811, -50.162001017), (-40, -46.547749412), (-31.721381389, -39.437264571))
            ThreePointArc((-31.721381389, -39.437264571), (-32.188298749, -35.220395094), (-36.405168225, -35.687312455))
            ThreePointArc((-36.405168225, -35.687312455), (-43, -41.351596989), (-51.202830189, -44.230746573))
            ThreePointArc((-51.202830189, -44.230746573), (-53.715627222, -47.649203984), (-50.297169811, -50.162001017))
        make_face()
        with BuildLine():
            ThreePointArc((-33.758571613, -16.351351351), (-36.130453819, -10.25), (-40.228437983, -5.145214079))
            ThreePointArc((-40.228437983, -5.145214079), (-44.466998161, -5.331245322), (-44.280966918, -9.569805499))
            ThreePointArc((-44.280966918, -9.569805499), (-41.326606241, -13.25), (-39.616644651, -17.648648649))
            ThreePointArc((-39.616644651, -17.648648649), (-36.038959483, -19.929036519), (-33.758571613, -16.351351351))
        make_face()
        with BuildLine():
            ThreePointArc((-77.778618612, -39.437264571), (-69.5, -46.547749412), (-59.202830189, -50.162001017))
            ThreePointArc((-59.202830189, -50.162001017), (-55.784372778, -47.649203984), (-58.297169811, -44.230746573))
            ThreePointArc((-58.297169811, -44.230746573), (-66.5, -41.351596989), (-73.094831775, -35.687312455))
            ThreePointArc((-73.094831775, -35.687312455), (-77.311701251, -35.220395094), (-77.778618612, -39.437264571))
        make_face()
        with BuildLine():
            ThreePointArc((-40.228437983, -36.854785921), (-36.130453819, -31.75), (-33.758571613, -25.648648649))
            ThreePointArc((-33.758571613, -25.648648649), (-36.038959483, -22.070963481), (-39.616644651, -24.351351351))
            ThreePointArc((-39.616644651, -24.351351351), (-41.326606241, -28.75), (-44.280966918, -32.430194501))
            ThreePointArc((-44.280966918, -32.430194501), (-44.466998161, -36.668754678), (-40.228437983, -36.854785921))
        make_face()
    extrude(amount=-CUT_EXTRUDE_1_DEPTH, mode=Mode.SUBTRACT)


solid = part.part
